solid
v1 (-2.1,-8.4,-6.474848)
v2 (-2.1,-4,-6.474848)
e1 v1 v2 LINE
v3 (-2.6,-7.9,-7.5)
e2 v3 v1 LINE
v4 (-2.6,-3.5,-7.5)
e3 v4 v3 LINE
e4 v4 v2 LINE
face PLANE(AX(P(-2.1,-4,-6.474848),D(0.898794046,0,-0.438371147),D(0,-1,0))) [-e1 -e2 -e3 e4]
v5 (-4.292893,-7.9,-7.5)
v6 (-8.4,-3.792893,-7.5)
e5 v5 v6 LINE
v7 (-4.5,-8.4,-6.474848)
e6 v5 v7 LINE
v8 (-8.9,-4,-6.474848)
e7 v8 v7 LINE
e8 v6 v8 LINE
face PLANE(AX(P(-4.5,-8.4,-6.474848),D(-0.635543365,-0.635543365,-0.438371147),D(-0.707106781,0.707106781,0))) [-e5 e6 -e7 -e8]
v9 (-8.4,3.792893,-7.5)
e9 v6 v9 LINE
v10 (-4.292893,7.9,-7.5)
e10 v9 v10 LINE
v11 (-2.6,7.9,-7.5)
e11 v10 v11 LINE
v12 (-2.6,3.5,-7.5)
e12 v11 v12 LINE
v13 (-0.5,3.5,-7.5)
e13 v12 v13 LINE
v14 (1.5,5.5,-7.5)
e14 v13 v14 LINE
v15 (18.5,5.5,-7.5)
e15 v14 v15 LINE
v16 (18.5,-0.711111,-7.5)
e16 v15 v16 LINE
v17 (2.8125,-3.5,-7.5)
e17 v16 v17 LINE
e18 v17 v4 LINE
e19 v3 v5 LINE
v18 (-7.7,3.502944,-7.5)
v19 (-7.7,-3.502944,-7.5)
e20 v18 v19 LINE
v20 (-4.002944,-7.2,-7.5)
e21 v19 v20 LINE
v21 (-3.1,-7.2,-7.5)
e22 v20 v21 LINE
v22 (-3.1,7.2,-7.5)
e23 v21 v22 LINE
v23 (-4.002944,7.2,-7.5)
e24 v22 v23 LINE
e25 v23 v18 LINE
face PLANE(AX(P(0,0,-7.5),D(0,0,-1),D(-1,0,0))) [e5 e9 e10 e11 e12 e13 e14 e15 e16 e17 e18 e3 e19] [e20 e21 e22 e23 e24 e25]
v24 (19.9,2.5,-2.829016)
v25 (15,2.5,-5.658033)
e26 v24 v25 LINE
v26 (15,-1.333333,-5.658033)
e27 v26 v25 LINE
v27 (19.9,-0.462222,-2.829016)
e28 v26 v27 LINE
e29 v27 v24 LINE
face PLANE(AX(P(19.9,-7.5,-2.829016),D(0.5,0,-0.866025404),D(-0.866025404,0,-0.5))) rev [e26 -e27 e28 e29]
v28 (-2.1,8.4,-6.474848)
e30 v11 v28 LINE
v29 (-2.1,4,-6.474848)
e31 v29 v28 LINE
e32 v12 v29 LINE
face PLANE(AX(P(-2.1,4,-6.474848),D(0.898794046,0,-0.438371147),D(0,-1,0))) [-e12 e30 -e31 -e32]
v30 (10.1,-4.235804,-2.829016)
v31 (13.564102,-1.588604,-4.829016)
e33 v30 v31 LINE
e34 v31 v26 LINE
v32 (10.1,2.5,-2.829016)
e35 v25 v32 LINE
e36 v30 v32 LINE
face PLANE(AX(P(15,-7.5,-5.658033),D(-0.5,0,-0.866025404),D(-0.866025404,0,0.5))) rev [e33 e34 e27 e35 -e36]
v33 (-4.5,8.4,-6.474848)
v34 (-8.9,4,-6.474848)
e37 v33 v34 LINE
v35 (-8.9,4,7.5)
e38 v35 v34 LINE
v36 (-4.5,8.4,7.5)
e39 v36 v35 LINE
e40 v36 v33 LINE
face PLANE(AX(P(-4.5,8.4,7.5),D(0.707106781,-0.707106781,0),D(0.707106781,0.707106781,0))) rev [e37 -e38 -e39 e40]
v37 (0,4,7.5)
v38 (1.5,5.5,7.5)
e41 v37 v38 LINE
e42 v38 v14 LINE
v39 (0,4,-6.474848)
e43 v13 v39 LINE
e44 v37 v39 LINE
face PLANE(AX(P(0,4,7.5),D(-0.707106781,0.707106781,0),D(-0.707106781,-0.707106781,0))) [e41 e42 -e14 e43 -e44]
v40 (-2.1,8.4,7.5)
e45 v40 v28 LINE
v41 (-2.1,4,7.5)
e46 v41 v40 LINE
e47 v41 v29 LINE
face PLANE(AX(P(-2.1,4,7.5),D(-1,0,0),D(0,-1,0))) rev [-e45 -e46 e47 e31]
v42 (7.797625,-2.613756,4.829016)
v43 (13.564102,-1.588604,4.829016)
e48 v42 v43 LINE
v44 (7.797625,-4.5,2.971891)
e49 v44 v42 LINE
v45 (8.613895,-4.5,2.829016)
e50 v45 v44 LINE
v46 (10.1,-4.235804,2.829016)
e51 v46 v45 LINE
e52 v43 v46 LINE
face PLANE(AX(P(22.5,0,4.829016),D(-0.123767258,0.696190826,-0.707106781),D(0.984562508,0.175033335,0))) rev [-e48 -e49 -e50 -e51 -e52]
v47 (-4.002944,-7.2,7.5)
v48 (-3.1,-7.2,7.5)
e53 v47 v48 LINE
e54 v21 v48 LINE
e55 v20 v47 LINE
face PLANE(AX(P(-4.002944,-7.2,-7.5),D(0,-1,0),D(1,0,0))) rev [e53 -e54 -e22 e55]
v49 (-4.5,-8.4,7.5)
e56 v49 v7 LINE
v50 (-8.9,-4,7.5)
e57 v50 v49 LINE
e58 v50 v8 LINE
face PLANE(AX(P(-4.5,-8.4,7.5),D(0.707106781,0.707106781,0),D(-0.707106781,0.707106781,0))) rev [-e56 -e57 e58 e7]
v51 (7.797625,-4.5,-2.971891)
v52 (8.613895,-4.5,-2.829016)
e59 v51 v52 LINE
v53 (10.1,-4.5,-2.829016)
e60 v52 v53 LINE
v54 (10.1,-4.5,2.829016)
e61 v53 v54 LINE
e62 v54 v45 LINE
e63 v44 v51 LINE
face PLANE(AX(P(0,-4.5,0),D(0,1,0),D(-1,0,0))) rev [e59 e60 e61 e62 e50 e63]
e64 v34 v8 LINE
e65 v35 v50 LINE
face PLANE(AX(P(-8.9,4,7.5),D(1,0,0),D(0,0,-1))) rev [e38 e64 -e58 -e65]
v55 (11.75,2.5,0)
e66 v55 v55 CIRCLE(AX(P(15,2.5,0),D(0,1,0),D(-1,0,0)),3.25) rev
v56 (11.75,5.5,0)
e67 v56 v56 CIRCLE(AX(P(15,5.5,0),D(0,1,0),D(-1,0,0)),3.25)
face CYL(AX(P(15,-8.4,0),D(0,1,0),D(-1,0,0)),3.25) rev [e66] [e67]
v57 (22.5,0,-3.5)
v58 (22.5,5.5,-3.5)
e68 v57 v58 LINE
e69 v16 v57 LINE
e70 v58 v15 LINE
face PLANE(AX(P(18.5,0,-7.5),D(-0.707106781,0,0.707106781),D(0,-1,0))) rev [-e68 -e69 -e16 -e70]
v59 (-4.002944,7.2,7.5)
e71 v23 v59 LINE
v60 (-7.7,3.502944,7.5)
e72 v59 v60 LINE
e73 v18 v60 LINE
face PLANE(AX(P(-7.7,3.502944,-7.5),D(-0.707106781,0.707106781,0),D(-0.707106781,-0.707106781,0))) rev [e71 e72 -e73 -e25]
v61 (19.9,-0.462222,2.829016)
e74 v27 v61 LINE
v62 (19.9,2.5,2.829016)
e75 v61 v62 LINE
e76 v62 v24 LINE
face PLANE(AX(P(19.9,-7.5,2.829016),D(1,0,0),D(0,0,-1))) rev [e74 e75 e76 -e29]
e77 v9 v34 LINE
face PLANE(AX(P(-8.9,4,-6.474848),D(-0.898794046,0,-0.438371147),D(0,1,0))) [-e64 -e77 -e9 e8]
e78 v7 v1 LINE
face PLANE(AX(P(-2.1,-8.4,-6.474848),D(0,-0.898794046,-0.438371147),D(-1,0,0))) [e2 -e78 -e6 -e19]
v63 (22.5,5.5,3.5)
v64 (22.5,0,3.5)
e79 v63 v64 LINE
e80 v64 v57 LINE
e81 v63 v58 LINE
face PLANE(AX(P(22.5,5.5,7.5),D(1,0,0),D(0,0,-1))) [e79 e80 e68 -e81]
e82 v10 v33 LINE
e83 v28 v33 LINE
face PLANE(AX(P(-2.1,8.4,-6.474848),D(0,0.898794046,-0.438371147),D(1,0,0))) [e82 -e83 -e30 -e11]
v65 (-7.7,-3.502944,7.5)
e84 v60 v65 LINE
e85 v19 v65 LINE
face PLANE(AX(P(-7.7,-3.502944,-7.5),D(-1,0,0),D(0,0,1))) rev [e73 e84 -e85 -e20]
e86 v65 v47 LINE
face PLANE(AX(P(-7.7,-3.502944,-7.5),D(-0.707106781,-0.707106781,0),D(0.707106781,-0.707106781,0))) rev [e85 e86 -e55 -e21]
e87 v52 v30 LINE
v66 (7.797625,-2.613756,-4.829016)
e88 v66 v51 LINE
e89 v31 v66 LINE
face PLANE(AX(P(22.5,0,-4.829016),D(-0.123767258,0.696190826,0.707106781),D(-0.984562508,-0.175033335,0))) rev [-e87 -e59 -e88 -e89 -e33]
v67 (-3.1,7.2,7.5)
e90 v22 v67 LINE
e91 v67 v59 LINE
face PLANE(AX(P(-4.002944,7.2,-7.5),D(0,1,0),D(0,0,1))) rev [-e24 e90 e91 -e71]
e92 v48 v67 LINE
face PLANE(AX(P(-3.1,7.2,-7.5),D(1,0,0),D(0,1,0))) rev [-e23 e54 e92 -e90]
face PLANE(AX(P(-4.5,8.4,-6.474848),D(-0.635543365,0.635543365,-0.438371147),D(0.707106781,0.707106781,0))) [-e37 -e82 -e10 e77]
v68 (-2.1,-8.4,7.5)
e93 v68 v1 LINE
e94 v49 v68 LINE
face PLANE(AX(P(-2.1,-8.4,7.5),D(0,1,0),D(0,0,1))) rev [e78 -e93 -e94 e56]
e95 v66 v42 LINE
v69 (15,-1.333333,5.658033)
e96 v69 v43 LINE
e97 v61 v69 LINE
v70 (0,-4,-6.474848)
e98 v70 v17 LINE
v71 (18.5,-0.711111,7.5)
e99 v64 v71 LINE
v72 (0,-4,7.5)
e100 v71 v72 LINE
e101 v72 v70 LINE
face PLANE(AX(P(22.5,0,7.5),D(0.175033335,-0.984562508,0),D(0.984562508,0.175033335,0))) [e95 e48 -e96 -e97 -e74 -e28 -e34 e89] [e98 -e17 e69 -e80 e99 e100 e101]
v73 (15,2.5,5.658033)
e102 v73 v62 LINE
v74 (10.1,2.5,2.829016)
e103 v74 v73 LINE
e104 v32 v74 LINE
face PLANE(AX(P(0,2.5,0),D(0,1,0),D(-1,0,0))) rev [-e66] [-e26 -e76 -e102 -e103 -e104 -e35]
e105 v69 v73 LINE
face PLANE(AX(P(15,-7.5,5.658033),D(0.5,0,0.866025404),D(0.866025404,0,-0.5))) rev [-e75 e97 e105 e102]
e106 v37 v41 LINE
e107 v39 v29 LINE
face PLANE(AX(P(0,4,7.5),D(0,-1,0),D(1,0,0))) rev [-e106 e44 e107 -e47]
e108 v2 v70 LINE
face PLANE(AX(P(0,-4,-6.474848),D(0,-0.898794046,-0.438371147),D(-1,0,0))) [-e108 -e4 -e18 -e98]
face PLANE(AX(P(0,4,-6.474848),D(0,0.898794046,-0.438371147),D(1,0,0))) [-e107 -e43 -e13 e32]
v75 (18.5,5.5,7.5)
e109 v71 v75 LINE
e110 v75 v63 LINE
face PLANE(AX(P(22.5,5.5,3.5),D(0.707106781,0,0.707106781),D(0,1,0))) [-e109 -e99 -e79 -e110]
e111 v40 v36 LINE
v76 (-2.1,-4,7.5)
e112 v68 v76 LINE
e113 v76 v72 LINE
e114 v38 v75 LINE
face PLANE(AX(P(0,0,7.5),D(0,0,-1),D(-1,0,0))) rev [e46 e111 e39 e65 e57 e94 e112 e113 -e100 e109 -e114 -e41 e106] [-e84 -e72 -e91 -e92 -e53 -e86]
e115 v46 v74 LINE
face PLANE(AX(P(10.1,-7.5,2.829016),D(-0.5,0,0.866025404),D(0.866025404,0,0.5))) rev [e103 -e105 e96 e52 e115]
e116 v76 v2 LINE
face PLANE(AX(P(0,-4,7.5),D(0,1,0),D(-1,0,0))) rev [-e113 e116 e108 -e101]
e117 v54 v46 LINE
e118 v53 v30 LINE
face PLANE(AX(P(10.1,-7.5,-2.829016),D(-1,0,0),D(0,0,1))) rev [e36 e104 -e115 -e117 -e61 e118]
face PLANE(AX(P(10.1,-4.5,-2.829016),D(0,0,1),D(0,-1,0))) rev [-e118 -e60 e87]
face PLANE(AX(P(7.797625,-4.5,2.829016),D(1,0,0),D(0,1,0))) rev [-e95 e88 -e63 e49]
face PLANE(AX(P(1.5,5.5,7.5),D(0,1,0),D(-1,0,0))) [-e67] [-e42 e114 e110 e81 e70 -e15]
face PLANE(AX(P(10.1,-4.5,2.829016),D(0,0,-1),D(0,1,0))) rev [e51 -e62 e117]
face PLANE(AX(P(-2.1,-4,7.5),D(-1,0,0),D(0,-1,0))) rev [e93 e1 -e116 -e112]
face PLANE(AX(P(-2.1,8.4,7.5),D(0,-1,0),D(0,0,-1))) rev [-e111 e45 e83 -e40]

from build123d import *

# Parameters (mm, degrees)
SALIENTE_EXTRUIR1_DEPTH = 7.5
SALIENTE_EXTRUIR2_DEPTH = 15
CROQUIS7_R              = 3.25
CORTAR_EXTRUIR4_DEPTH   = 28.490180065
CORTAR_EXTRUIR5_START   = -3
CORTAR_EXTRUIR5_DEPTH   = 10
CROQUIS9_W              = 2.302374724
CROQUIS9_H              = 5.658032638
SALIENTE_EXTRUIR3_DEPTH = 7
CHAFL_N3_SIZE           = 2
CORTAR_EXTRUIR3_DEPTH   = 29.316249752
CHAFL_N4_SIZE           = 4
CHAFL_N2_SIZE           = 0.5
CHAFL_N2_SIZE2          = 1.025151921


with BuildPart() as part:
    # Croquis1 → Saliente-Extruir1 (new, symmetric)
    with BuildSketch(Plane.XY):
        Polygon((0, 4), (-2.1, 4), (-2.1, 8.4), (-4.5, 8.4), (-8.9, 4), (-8.9, -4), (-4.5, -8.4), (-2.1, -8.4), (-2.1, -4), (0, -4), align=None)
    extrude(amount=SALIENTE_EXTRUIR1_DEPTH, both=True)

    # Croquis6 → Saliente-Extruir2 (add, through all)
    with BuildSketch(Plane(origin=(0, 0, -7.5), x_dir=(-1, 0, 0), z_dir=(0, 0, -1))):
        Polygon((0, 4), (-1.5, 5.5), (-22.5, 5.5), (-22.5, 0), (0, -4), align=None)
    extrude(amount=-SALIENTE_EXTRUIR2_DEPTH)

    # Croquis7 → Cortar-Extruir4 (cut, through all)
    with BuildSketch(Plane(origin=(0, 5.5, 0), x_dir=(1, 0, 0), z_dir=(0, 1, 0))):
        with Locations(Location((15, 0, 0), (0, 0, 180))):
            Circle(CROQUIS7_R)
    extrude(amount=-CORTAR_EXTRUIR4_DEPTH, mode=Mode.SUBTRACT)

    # Croquis8 → Cortar-Extruir5 (cut)
    with BuildSketch(Plane(origin=(0, 5.5, 0), x_dir=(1, 0, 0), z_dir=(0, 1, 0)).offset(CORTAR_EXTRUIR5_START)):
        Polygon((15, 5.658032638), (10.1, 2.829016319), (10.1, -2.829016319), (15, -5.658032638), (19.9, -2.829016319), (19.9, 2.829016319), align=None)
    extrude(amount=-CORTAR_EXTRUIR5_DEPTH, mode=Mode.SUBTRACT)

    # Croquis9 → Saliente-Extruir3 (add)
    with BuildSketch(Plane.XZ.offset(-2.5)):
        with Locations((8.948812638, 0)):
            Rectangle(CROQUIS9_W, CROQUIS9_H)
    extrude(amount=SALIENTE_EXTRUIR3_DEPTH)

    # Chaflán3
    # the kernel refuses this chamfer: 2 mm, written as the material it adds along each edge
    with BuildSketch(Plane(origin=(2.733659972, -3.514016005, 2.829016319), x_dir=(-0.004812694974131689, 0.02707140922949076, 0.9996219169112968), z_dir=(0.9845625077859067, 0.1750333347174944, 0))) as chafl_n3_piece_1_section:
        Polygon((CHAFL_N3_SIZE * 0.999621916911, CHAFL_N3_SIZE * 0.0274958766106), (-CHAFL_N3_SIZE * 0.0274958766106, CHAFL_N3_SIZE * 0.999621916911), (0, 0), align=None)
    chafl_n3_piece_1 = extrude(amount=12.625206864, mode=Mode.PRIVATE)
    chafl_n3_piece_1 = split(chafl_n3_piece_1, bisect_by=Plane(origin=(9.52379564, -3.075112264, 2.496344577), z_dir=(-0.4999999999999998, 0, 0.8660254037844388)), keep=Keep.TOP, mode=Mode.PRIVATE)
    chafl_n3_piece_1 = split(chafl_n3_piece_1, bisect_by=Plane(origin=(7.797625276, -3.075112264, 3.490856258), z_dir=(1, 0, 0)), keep=Keep.TOP, mode=Mode.PRIVATE)
    chafl_n3_piece_1 = split(chafl_n3_piece_1, bisect_by=Plane(origin=(8.949614054, -4.5, 3.490856258), z_dir=(0, 1, 0)), keep=Keep.TOP, mode=Mode.PRIVATE)
    chafl_n3_piece_1 = split(chafl_n3_piece_1, bisect_by=Plane(origin=(10.1, -3.075112264, 3.490856258), z_dir=(-1, 0, 0)), keep=Keep.TOP, mode=Mode.PRIVATE)
    add(chafl_n3_piece_1)
    with BuildSketch(Plane(origin=(2.733659972, -3.514016005, 2.829016319), x_dir=(-0.004812694974131689, 0.02707140922949076, 0.9996219169112968), z_dir=(0.9845625077859067, 0.1750333347174944, 0))) as chafl_n3_piece_2_section:
        Polygon((CHAFL_N3_SIZE * 0.999621916911, CHAFL_N3_SIZE * 0.0274958766106), (-CHAFL_N3_SIZE * 0.0274958766106, CHAFL_N3_SIZE * 0.999621916911), (0, 0), align=None)
    chafl_n3_piece_2 = extrude(amount=12.625206864, mode=Mode.PRIVATE)
    chafl_n3_piece_2 = split(chafl_n3_piece_2, bisect_by=Plane(origin=(11.228614623, -2.50665574, 3.480622276), z_dir=(-0.4999999999999998, 0, 0.8660254037844388)), keep=Keep.TOP, mode=Mode.PRIVATE)
    chafl_n3_piece_2 = split(chafl_n3_piece_2, bisect_by=Plane(origin=(10.1, -2.50665574, 3.87158585), z_dir=(1, 0, 0)), keep=Keep.TOP, mode=Mode.PRIVATE)
    add(chafl_n3_piece_2)
    with BuildSketch(Plane(origin=(15.163965304, -1.304183946, -2.829016319), x_dir=(-0.004812694974131689, 0.02707140922949076, -0.9996219169112968), z_dir=(-0.9845625077859067, -0.1750333347174944, 0))) as chafl_n3_piece_3_section:
        Polygon((CHAFL_N3_SIZE * 0.999621916911, CHAFL_N3_SIZE * 0.0274958766106), (-CHAFL_N3_SIZE * 0.0274958766106, CHAFL_N3_SIZE * 0.999621916911), (0, 0), align=None)
    chafl_n3_piece_3 = extrude(amount=12.625206864, mode=Mode.PRIVATE)
    chafl_n3_piece_3 = split(chafl_n3_piece_3, bisect_by=Plane(origin=(11.228614623, -2.50665574, -3.480622276), z_dir=(-0.49999999999999994, 0, -0.8660254037844387)), keep=Keep.TOP, mode=Mode.PRIVATE)
    chafl_n3_piece_3 = split(chafl_n3_piece_3, bisect_by=Plane(origin=(10.1, -2.50665574, -3.87158585), z_dir=(1, 0, 0)), keep=Keep.TOP, mode=Mode.PRIVATE)
    add(chafl_n3_piece_3)
    with BuildSketch(Plane(origin=(15.163965304, -1.304183946, -2.829016319), x_dir=(-0.004812694974131689, 0.02707140922949076, -0.9996219169112968), z_dir=(-0.9845625077859067, -0.1750333347174944, 0))) as chafl_n3_piece_4_section:
        Polygon((CHAFL_N3_SIZE * 0.999621916911, CHAFL_N3_SIZE * 0.0274958766106), (-CHAFL_N3_SIZE * 0.0274958766106, CHAFL_N3_SIZE * 0.999621916911), (0, 0), align=None)
    chafl_n3_piece_4 = extrude(amount=12.625206864, mode=Mode.PRIVATE)
    chafl_n3_piece_4 = split(chafl_n3_piece_4, bisect_by=Plane(origin=(9.52379564, -3.075112264, -2.496344577), z_dir=(-0.49999999999999994, 0, -0.8660254037844387)), keep=Keep.TOP, mode=Mode.PRIVATE)
    chafl_n3_piece_4 = split(chafl_n3_piece_4, bisect_by=Plane(origin=(7.797625276, -3.075112264, -3.490856258), z_dir=(1, 0, 0)), keep=Keep.TOP, mode=Mode.PRIVATE)
    chafl_n3_piece_4 = split(chafl_n3_piece_4, bisect_by=Plane(origin=(10.1, -3.075112264, -3.490856258), z_dir=(-1, 0, 0)), keep=Keep.TOP, mode=Mode.PRIVATE)
    chafl_n3_piece_4 = split(chafl_n3_piece_4, bisect_by=Plane(origin=(8.949614054, -4.5, -3.490856258), z_dir=(0, 1, 0)), keep=Keep.TOP, mode=Mode.PRIVATE)
    add(chafl_n3_piece_4)

    # Croquis5 → Cortar-Extruir3 (cut, through all)
    with BuildSketch(Plane.XY.offset(7.5)):
        Polygon((-3.1, 7.2), (-3.1, -7.2), (-4.002943725, -7.2), (-7.7, -3.502943725), (-7.7, 3.502943725), (-4.002943725, 7.2), align=None)
    extrude(amount=-CORTAR_EXTRUIR3_DEPTH, mode=Mode.SUBTRACT)

    # Chaflán4
    chafl_n4_edges = [part.edges().sort_by_distance(p)[0] for p in [
        (22.5, 2.75, 7.5),
        (22.5, 2.75, -7.5),
    ]]
    chamfer(chafl_n4_edges, length=CHAFL_N4_SIZE)

    # Chaflán2
    chafl_n2_edges = [part.edges().sort_by_distance(p)[0] for p in [
        (-1.05, -4, -7.5),
        (-2.1, -6.2, -7.5),
        (-3.3, -8.4, -7.5),
        (-6.7, -6.2, -7.5),
        (-8.9, 0, -7.5),
        (-6.7, 6.2, -7.5),
        (-3.3, 8.4, -7.5),
        (-2.1, 6.2, -7.5),
        (-1.05, 4, -7.5),
    ]]
    chafl_n2_side = [part.faces().sort_by_distance(p)[0] for p in [
        (5.002983823, 1.055154991, -7.5),
    ]]
    chamfer(chafl_n2_edges, length=CHAFL_N2_SIZE, length2=CHAFL_N2_SIZE2, reference=chafl_n2_side[0])


solid = part.part
